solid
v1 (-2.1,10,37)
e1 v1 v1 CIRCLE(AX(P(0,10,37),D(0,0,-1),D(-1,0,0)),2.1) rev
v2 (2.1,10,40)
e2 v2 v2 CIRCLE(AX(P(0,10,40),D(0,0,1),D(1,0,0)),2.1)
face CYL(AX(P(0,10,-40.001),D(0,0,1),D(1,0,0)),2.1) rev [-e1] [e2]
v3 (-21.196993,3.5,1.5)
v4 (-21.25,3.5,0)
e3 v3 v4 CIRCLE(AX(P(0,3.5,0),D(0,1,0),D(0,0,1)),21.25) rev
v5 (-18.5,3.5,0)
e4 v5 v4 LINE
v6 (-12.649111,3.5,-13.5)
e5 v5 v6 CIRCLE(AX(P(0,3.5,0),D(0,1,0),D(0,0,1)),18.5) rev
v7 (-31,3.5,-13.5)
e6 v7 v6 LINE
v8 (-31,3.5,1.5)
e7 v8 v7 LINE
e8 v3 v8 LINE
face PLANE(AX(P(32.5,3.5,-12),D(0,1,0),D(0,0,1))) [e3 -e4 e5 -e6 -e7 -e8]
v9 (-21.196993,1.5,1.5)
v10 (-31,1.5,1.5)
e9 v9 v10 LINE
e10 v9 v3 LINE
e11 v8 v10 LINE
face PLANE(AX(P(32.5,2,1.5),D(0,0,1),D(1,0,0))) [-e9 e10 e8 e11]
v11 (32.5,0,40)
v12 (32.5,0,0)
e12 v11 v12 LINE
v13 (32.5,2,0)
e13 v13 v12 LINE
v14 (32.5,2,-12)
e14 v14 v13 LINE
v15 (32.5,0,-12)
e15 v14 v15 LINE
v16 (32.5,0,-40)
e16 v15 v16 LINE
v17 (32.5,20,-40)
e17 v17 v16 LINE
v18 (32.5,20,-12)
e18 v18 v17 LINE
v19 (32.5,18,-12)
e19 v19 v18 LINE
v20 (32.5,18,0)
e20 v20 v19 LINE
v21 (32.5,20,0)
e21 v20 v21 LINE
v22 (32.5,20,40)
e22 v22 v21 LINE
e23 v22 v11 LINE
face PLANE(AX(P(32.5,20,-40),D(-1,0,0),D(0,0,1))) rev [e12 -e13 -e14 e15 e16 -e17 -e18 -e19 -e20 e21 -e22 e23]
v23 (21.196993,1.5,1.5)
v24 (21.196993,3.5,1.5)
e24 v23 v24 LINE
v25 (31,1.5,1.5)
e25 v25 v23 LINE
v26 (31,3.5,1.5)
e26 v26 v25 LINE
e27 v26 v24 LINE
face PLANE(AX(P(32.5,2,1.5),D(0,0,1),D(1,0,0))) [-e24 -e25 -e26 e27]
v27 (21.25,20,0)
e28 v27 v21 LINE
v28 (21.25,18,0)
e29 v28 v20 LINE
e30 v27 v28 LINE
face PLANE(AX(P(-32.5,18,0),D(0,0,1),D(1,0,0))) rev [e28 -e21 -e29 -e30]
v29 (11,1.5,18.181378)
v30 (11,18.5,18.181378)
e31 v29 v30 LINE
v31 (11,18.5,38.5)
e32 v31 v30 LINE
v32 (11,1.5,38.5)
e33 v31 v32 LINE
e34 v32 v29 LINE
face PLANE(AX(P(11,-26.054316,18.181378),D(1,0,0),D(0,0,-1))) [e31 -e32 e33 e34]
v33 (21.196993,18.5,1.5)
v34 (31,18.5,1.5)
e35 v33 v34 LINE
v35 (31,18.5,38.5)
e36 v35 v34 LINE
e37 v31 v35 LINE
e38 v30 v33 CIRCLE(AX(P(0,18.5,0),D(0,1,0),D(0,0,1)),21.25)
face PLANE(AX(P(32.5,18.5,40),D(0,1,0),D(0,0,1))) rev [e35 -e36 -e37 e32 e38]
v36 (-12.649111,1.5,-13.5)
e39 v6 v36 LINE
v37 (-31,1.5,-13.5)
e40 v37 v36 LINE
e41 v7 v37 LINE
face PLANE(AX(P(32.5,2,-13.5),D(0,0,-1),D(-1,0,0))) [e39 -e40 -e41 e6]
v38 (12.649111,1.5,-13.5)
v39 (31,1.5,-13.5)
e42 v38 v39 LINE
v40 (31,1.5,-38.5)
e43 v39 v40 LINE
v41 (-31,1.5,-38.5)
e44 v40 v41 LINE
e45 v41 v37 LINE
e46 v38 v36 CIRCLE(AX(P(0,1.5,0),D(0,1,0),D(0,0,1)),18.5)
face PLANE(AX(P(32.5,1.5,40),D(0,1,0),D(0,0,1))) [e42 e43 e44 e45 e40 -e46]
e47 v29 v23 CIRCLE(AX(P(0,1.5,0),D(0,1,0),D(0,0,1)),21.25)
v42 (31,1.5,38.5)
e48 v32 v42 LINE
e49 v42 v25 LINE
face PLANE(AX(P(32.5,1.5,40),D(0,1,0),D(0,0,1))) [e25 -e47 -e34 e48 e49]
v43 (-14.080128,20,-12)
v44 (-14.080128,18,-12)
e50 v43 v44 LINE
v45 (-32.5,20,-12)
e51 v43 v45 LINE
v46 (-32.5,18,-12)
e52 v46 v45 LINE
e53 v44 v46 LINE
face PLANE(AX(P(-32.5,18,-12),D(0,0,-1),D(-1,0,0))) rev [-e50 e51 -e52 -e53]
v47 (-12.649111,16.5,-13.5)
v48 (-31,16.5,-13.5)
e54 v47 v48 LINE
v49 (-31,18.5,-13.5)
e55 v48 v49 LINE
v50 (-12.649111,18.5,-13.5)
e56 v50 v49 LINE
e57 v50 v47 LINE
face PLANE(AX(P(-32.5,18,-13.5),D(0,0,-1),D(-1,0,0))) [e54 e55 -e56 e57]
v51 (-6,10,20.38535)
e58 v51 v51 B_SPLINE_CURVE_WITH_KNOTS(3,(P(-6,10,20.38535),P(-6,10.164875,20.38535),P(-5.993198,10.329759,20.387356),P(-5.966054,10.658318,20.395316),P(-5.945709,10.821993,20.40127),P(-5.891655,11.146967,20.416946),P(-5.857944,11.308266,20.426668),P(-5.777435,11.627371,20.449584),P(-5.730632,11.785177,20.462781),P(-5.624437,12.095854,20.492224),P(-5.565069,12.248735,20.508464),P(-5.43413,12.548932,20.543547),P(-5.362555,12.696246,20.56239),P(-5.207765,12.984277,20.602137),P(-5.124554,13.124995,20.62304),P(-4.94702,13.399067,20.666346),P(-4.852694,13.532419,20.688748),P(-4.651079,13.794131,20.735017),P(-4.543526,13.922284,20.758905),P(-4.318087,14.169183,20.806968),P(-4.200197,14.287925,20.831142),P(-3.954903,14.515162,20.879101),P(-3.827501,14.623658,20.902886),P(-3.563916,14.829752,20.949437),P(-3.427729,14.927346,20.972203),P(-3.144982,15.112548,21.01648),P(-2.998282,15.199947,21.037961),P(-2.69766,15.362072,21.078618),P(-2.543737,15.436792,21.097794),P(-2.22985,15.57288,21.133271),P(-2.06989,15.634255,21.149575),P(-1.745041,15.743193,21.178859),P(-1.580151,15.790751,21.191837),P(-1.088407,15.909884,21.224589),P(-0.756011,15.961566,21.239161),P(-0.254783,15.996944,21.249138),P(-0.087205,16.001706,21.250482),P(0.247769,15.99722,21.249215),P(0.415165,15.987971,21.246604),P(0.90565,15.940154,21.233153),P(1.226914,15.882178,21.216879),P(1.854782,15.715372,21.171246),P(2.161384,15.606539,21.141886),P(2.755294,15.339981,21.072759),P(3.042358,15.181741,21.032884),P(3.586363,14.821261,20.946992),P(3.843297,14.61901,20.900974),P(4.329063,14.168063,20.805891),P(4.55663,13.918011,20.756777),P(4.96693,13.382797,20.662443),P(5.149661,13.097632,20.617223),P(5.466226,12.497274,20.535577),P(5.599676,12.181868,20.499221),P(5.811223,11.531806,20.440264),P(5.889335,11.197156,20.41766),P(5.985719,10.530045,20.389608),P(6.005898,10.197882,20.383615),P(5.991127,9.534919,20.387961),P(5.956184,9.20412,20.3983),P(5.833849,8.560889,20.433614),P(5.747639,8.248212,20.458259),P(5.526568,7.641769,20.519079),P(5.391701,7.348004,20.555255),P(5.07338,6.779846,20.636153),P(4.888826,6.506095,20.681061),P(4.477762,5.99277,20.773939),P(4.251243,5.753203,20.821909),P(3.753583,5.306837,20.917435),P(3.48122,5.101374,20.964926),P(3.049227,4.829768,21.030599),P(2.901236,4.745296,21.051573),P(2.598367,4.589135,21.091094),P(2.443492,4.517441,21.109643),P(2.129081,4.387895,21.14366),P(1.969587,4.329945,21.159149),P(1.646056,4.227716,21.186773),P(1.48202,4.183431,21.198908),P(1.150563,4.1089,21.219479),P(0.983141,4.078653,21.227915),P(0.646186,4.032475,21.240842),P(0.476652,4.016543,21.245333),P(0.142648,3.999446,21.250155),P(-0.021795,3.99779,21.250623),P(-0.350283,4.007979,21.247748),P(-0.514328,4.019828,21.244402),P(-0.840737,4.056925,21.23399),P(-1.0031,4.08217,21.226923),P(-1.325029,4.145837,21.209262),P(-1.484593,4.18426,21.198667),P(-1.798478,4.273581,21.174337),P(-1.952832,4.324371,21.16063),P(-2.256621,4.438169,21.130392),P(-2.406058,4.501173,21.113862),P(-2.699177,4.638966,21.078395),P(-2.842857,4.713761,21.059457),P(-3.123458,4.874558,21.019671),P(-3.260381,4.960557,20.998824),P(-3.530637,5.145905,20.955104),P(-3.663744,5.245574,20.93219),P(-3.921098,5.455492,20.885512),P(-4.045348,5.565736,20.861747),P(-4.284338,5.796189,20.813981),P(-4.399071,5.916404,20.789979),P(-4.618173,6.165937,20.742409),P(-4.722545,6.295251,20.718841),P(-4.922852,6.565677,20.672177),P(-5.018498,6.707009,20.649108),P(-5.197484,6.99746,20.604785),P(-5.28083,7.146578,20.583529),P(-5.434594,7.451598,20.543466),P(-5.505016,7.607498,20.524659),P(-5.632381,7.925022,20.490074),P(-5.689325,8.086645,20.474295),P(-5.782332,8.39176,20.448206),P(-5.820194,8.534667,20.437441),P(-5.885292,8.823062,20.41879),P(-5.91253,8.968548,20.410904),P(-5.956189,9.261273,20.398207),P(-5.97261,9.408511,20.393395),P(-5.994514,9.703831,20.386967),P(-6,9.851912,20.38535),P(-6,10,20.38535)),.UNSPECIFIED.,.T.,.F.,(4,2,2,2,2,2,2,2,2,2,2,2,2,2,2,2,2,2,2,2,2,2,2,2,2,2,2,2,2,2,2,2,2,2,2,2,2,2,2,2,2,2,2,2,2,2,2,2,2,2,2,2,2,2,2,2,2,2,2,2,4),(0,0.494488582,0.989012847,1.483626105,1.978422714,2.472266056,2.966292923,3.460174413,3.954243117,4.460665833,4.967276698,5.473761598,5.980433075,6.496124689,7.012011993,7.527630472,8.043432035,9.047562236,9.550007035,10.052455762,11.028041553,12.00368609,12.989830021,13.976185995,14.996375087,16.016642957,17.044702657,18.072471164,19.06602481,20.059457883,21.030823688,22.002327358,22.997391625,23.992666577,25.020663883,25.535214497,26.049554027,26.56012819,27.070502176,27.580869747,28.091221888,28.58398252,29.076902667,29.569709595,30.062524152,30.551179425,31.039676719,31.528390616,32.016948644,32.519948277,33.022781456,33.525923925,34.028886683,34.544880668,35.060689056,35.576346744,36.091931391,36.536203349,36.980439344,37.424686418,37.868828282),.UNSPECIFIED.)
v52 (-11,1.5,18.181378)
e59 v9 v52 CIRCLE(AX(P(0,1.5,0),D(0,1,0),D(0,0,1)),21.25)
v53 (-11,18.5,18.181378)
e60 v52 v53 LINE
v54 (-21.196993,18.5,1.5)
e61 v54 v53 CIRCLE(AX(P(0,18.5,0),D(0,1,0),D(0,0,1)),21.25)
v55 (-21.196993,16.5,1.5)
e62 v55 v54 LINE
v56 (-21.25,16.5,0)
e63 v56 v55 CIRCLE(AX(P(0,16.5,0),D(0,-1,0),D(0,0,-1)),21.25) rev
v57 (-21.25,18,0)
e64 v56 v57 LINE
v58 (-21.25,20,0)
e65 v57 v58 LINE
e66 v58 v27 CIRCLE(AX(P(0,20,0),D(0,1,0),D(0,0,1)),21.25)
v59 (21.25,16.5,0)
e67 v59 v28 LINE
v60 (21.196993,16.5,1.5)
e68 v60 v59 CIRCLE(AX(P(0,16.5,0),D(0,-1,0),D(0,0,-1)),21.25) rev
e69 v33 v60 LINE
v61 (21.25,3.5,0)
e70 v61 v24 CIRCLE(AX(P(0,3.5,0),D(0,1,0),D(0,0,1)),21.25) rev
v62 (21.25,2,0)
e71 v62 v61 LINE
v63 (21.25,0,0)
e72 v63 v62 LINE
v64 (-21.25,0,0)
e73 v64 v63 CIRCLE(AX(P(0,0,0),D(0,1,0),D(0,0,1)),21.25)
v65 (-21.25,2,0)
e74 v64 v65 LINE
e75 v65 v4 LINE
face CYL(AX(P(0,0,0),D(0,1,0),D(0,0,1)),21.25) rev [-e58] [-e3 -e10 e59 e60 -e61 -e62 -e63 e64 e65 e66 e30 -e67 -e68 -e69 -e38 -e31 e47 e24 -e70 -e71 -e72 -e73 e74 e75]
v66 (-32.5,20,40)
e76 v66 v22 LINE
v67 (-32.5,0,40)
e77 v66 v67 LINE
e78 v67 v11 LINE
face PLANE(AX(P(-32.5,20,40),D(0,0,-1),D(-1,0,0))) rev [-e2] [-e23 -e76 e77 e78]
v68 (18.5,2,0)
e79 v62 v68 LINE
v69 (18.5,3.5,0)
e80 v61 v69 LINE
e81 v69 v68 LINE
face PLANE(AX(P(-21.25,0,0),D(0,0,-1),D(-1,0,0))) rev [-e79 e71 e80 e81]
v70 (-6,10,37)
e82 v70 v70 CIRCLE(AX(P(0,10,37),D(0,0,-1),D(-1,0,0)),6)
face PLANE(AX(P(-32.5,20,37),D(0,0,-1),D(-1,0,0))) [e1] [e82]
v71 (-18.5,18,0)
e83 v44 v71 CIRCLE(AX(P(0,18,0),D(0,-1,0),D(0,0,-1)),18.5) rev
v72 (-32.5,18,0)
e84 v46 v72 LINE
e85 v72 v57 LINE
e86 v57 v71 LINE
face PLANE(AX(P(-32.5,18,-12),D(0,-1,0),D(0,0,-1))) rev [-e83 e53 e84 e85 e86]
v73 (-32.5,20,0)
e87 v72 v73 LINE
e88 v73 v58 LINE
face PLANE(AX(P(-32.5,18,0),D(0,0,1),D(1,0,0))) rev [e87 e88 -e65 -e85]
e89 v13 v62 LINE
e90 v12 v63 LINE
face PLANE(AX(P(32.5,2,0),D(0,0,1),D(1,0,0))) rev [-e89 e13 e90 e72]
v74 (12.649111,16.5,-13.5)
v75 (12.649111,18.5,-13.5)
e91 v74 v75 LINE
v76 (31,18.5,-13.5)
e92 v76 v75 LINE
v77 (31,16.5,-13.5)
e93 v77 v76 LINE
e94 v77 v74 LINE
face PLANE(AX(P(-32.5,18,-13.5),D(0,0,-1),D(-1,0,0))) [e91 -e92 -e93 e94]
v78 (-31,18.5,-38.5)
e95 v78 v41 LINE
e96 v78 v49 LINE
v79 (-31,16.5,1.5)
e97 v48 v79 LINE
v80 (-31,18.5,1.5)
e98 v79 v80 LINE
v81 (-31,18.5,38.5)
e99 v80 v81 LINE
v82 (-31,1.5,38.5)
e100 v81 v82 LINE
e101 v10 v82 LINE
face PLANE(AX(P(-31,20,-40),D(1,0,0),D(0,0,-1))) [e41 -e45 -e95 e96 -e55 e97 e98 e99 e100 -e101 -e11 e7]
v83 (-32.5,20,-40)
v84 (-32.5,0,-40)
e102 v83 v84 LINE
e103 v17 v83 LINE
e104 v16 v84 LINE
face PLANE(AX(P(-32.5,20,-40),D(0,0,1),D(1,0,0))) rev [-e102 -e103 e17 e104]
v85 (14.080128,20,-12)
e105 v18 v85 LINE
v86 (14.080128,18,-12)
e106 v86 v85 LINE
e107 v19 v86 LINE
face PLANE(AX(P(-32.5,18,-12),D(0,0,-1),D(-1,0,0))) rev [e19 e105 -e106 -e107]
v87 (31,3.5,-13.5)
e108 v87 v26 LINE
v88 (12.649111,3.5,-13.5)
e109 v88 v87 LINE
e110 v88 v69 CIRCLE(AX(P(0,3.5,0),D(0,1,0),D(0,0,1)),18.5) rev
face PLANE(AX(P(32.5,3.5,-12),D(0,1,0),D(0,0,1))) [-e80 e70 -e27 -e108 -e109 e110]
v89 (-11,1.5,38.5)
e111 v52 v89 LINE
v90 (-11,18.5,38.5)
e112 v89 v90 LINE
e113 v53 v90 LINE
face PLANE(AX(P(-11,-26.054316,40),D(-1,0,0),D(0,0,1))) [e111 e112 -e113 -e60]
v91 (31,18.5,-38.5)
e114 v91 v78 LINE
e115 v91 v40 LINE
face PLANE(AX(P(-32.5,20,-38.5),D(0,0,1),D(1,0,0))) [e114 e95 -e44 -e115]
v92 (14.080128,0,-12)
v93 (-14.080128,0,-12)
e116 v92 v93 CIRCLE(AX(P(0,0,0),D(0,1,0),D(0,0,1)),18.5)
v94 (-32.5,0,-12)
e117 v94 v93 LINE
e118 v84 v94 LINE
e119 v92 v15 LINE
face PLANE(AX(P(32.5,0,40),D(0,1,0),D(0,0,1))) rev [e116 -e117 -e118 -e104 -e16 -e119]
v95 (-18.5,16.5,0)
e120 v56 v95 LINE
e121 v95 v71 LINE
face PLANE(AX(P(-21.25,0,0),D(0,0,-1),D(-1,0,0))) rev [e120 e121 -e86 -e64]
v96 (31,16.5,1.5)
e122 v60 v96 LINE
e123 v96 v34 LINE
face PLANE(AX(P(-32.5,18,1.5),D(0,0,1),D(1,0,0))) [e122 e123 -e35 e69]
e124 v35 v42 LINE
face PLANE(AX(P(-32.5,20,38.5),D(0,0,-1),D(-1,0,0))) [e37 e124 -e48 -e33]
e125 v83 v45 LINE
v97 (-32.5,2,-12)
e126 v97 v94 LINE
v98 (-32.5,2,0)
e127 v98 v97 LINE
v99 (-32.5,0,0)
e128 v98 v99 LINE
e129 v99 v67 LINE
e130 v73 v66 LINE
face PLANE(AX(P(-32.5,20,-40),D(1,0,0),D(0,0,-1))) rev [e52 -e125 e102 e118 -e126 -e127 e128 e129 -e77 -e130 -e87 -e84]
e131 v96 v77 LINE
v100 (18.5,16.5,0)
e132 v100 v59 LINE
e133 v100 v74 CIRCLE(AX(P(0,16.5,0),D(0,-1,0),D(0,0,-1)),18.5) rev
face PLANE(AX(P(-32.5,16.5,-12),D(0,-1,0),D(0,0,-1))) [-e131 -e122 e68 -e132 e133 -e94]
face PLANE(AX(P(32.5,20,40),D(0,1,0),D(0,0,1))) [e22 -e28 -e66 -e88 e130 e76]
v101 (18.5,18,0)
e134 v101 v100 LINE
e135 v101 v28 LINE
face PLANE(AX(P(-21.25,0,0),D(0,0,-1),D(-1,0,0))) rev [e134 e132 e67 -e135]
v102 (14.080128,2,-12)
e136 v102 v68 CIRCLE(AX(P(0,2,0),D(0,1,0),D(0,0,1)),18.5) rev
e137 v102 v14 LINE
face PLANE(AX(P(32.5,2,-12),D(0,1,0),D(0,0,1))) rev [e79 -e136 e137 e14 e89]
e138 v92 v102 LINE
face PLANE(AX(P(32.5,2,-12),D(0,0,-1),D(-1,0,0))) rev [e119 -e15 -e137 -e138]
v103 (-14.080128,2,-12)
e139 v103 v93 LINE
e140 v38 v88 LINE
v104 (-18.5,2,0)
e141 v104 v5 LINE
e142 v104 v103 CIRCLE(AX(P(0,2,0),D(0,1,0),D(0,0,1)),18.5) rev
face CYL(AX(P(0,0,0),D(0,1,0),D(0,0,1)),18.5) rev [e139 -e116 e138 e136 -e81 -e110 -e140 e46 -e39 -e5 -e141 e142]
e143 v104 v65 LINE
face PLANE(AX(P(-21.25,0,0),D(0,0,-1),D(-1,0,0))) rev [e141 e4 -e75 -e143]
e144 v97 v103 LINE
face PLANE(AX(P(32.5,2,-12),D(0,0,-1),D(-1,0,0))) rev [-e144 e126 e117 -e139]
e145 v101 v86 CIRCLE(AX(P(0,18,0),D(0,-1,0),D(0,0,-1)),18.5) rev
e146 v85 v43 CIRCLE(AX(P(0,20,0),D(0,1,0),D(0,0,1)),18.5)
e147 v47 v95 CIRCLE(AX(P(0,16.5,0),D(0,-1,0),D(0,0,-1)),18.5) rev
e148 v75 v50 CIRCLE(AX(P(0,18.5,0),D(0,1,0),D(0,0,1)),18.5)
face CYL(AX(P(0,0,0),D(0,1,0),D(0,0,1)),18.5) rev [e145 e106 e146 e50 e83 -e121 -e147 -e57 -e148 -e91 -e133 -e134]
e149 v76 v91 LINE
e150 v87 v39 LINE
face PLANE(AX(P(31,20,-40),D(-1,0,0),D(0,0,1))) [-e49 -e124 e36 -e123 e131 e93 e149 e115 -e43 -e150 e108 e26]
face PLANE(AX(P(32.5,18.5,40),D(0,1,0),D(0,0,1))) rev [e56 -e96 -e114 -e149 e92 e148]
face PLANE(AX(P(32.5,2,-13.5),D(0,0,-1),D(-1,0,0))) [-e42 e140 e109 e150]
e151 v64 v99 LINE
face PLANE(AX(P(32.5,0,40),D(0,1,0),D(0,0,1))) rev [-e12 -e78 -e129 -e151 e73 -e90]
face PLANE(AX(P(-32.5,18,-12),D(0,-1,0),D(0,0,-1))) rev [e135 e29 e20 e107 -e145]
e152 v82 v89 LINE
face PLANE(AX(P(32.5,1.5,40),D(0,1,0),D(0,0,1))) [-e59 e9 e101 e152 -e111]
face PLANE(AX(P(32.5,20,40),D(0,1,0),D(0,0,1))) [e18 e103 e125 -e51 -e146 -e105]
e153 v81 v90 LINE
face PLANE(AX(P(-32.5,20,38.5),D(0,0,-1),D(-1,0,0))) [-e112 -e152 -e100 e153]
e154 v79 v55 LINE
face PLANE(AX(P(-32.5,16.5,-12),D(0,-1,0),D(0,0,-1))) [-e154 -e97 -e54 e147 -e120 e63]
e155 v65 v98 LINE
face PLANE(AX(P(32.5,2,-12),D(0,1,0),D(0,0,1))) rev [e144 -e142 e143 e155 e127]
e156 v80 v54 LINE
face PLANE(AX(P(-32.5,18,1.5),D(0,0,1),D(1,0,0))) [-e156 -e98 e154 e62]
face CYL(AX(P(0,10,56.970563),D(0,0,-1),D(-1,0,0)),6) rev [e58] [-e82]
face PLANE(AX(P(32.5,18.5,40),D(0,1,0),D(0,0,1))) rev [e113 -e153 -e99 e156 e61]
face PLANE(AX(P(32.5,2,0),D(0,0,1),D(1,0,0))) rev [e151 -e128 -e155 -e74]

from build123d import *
from build123d.topology import SkipClean

# Parameters (mm, degrees)
SKETCH_1_W              = 65
SKETCH_1_H              = 80
EXTRUDE_1_DEPTH         = 20
CUT_EXTRUDE_1_DEPTH     = 56.283360969
SKETCH_3_R              = 18.5
CUT_EXTRUDE_2_DEPTH     = 56.283360969
SKETCH_4_R              = 6
CUT_EXTRUDE_3_DEPTH     = 37
CUT_EXTRUDE_4_REACH     = 90.635
SKETCH_5_R              = 2.1
SKETCH_6_W              = 65
SKETCH_6_H              = 12
CUT_EXTRUDE_5_DEPTH     = 2
SKETCH_7_W              = 65
SKETCH_7_H              = 12
CUT_EXTRUDE_6_DEPTH     = 2
SHELL_START             = -38.5
SHELL_1_DEPTH           = 77
SHELL_1_2_DEPTH         = 25
SHELL_START_2           = 1.5
SHELL_1_3_DEPTH         = 37
EXTRUDE_START           = 21.249883538
EXTRUDE_2_OUTLINE_W     = 22
EXTRUDE_2_OUTLINE_H     = 17
EXTRUDE_2_OUTLINE_R     = 7.5
EXTRUDE_2_OUTLINE_H_2   = 26.054315759
EXTRUDE_2_DEPTH         = 18.750116462
EXTRUDE_START_2         = 18.181377836
EXTRUDE_2_2_OUTLINE_W   = 22
EXTRUDE_2_2_OUTLINE_H   = 17
EXTRUDE_2_2_OUTLINE_H_2 = 26.054315759
EXTRUDE_2_2_DEPTH       = 3.068505702
EXTRUDE_START_3         = -26.054315759
EXTRUDE_2_3_DEPTH       = 44.554315759
SKETCH_9_W              = 21.818622164
SKETCH_9_H              = 26.054315759
CUT_EXTRUDE_7_DEPTH     = 65.583878559


with BuildPart() as part:
    # 草图1 → 凸台-拉伸1 (new body)
    with BuildSketch(Plane(origin=(0, 0, 0), x_dir=(1, 0, 0), z_dir=(0, 1, 0))):
        Rectangle(SKETCH_1_W, SKETCH_1_H)
    extrude(amount=EXTRUDE_1_DEPTH)

    # 草图2 → 切除-拉伸1 (cut, through all)
    with BuildSketch(Plane(origin=(0, 20, 0), x_dir=(1, 0, 0), z_dir=(0, 1, 0))):
        with BuildLine():
            Line((-21.25, 0), (21.25, 0))
            ThreePointArc((21.25, 0), (0, -21.25), (-21.25, 0))
        make_face()
    extrude(amount=-CUT_EXTRUDE_1_DEPTH, mode=Mode.SUBTRACT)

    # 草图3 → 切除-拉伸2 (cut, through all)
    with BuildSketch(Plane(origin=(0, 20, 0), x_dir=(-1, 0, 0), z_dir=(0, 1, 0))):
        Circle(SKETCH_3_R)
    extrude(amount=-CUT_EXTRUDE_2_DEPTH, mode=Mode.SUBTRACT)

    # 草图4 → 切除-拉伸3 (cut)
    with BuildSketch(Plane.XY):
        with Locations(Location((0, 10, 0), (0, 0, 180))):
            Circle(SKETCH_4_R)
    extrude(amount=CUT_EXTRUDE_3_DEPTH, mode=Mode.SUBTRACT)

    # 草图5 → 切除-拉伸4 (cut, up to next)
    with BuildSketch(Plane.XY.offset(40), mode=Mode.PRIVATE) as cut_extrude_4_sk1:
        with Locations((0, 10)):
            Circle(SKETCH_5_R)
    cut_extrude_4_tool1 = extrude(cut_extrude_4_sk1.sketch, amount=-CUT_EXTRUDE_4_REACH, mode=Mode.PRIVATE) & part.part
    add(cut_extrude_4_tool1.solids().sort_by_distance((0, 10, 40))[0], mode=Mode.SUBTRACT)

    # 草图6 → 切除-拉伸5 (cut)
    with BuildSketch(Plane(origin=(0, 20, 0), x_dir=(1, 0, 0), z_dir=(0, 1, 0))):
        with Locations((0, 6)):
            Rectangle(SKETCH_6_W, SKETCH_6_H)
    extrude(amount=-CUT_EXTRUDE_5_DEPTH, mode=Mode.SUBTRACT)

    # 草图7 → 切除-拉伸6 (cut)
    with BuildSketch(Plane.XZ):
        with Locations((0, -6)):
            Rectangle(SKETCH_7_W, SKETCH_7_H)
    extrude(amount=-CUT_EXTRUDE_6_DEPTH, mode=Mode.SUBTRACT)

    # 抽壳1: read off the stored shape, not the designer's step
    # 抽壳1 outline → 抽壳1 (cut)
    with BuildSketch(Plane.XY.offset(SHELL_START)):
        with BuildLine():
            Line((3.741657387, 3.5), (31, 3.5))
            Line((31, 3.5), (31, 16.5))
            Line((31, 16.5), (3.741657387, 16.5))
            ThreePointArc((3.741657387, 16.5), (7.5, 10), (3.741657387, 3.5))
        make_face()
        with BuildLine():
            Line((-31, 16.5), (-31, 3.5))
            Line((-31, 3.5), (-3.741657387, 3.5))
            ThreePointArc((-3.741657387, 3.5), (-7.5, 10), (-3.741657387, 16.5))
            Line((-3.741657387, 16.5), (-31, 16.5))
        make_face()
    extrude(amount=SHELL_1_DEPTH, mode=Mode.SUBTRACT)

    # Shell 1 2 outline → Shell 1 2 (cut)
    with BuildSketch(Plane.XY.offset(SHELL_START)):
        with BuildLine():
            Line((-31, 1.5), (31, 1.5))
            Line((31, 1.5), (31, 3.5))
            Line((31, 3.5), (3.741657387, 3.5))
            ThreePointArc((3.741657387, 3.5), (7.5, 10), (3.741657387, 16.5))
            Line((3.741657387, 16.5), (31, 16.5))
            Line((31, 16.5), (31, 18.5))
            Line((31, 18.5), (-31, 18.5))
            Line((-31, 18.5), (-31, 16.5))
            Line((-31, 16.5), (-3.741657387, 16.5))
            ThreePointArc((-3.741657387, 16.5), (-7.5, 10), (-3.741657387, 3.5))
            Line((-3.741657387, 3.5), (-31, 3.5))
            Line((-31, 3.5), (-31, 1.5))
        make_face()
    extrude(amount=SHELL_1_2_DEPTH, mode=Mode.SUBTRACT)

    # Shell 1 3 outline → Shell 1 3 (cut)
    with BuildSketch(Plane.XY.offset(SHELL_START_2)):
        with BuildLine():
            Line((-31, 1.5), (31, 1.5))
            Line((31, 1.5), (31, 3.5))
            Line((31, 3.5), (3.741657387, 3.5))
            ThreePointArc((3.741657387, 3.5), (0, 2.5), (-3.741657387, 3.5))
            Line((-3.741657387, 3.5), (-31, 3.5))
            Line((-31, 3.5), (-31, 1.5))
        make_face()
        with BuildLine():
            Line((3.741657387, 16.5), (31, 16.5))
            Line((31, 16.5), (31, 18.5))
            Line((31, 18.5), (-31, 18.5))
            Line((-31, 18.5), (-31, 16.5))
            Line((-31, 16.5), (-3.741657387, 16.5))
            ThreePointArc((-3.741657387, 16.5), (0, 17.5), (3.741657387, 16.5))
        make_face()
    extrude(amount=SHELL_1_3_DEPTH, mode=Mode.SUBTRACT)

    # 凸台-拉伸2: read off the stored shape, not the designer's step
    # 凸台-拉伸2 outline → 凸台-拉伸2 (add)
    # profile 1 of 2: a face of its own
    with BuildSketch(Plane.XY.offset(EXTRUDE_START)):
        with Locations((0, 10)):
            Rectangle(EXTRUDE_2_OUTLINE_W, EXTRUDE_2_OUTLINE_H)
        with Locations((0, 10)):
            Circle(EXTRUDE_2_OUTLINE_R, mode=Mode.SUBTRACT)
    # profile 2 of 2: a face of its own
    with BuildSketch(Plane.XY.offset(EXTRUDE_START)):
        with Locations((0, -13.02715788)):
            Rectangle(EXTRUDE_2_OUTLINE_W, EXTRUDE_2_OUTLINE_H_2)
    extrude(amount=EXTRUDE_2_DEPTH)

    # Extrude 2 2 outline → Extrude 2 2 (add)
    # profile 1 of 2: a face of its own
    with BuildSketch(Plane.XY.offset(EXTRUDE_START_2)):
        with Locations((0, 10)):
            Rectangle(EXTRUDE_2_2_OUTLINE_W, EXTRUDE_2_2_OUTLINE_H)
        with BuildLine():
            ThreePointArc((0.070228488, 2.50032881), (-5.676e-05, 2.5), (-0.070342004, 2.500329874))
            ThreePointArc((-0.070342004, 2.500329874), (-7.5, 10.000015586), (-0.070310835, 17.499670419))
            ThreePointArc((-0.070310835, 17.499670419), (-2.7611e-05, 17.5), (0.070255616, 17.499670936))
            ThreePointArc((0.070255616, 17.499670936), (7.5, 9.999986435), (0.070228488, 2.50032881))
        make_face(mode=Mode.SUBTRACT)
    # profile 2 of 2: a face of its own
    with BuildSketch(Plane.XY.offset(EXTRUDE_START_2)):
        with Locations((0, -13.02715788)):
            Rectangle(EXTRUDE_2_2_OUTLINE_W, EXTRUDE_2_2_OUTLINE_H_2)
    extrude(amount=EXTRUDE_2_2_DEPTH)

    # Extrude 2 3 outline → Extrude 2 3 (cut)
    with SkipClean():  # the faces are left unmerged after this step: merging them gives an invalid solid
        with BuildSketch(Plane(origin=(0, 0, 0), x_dir=(1, 0, 0), z_dir=(0, 1, 0)).offset(EXTRUDE_START_3)):
            with BuildLine():
                Line((11, -18.181377836), (-11, -18.181377836))
                ThreePointArc((-11, -18.181377836), (0, -21.25), (11, -18.181377836))
            make_face()
        extrude(amount=EXTRUDE_2_3_DEPTH, mode=Mode.SUBTRACT)

    # 草图9 → 切除-拉伸7 (cut, through all)
    with SkipClean():  # the faces are left unmerged after this step: merging them gives an invalid solid
        with BuildSketch(Plane(origin=(11, 0, 0), x_dir=(0, 0, -1), z_dir=(1, 0, 0))):
            with Locations((-29.090688918, -13.02715788)):
                Rectangle(SKETCH_9_W, SKETCH_9_H)
        extrude(amount=-CUT_EXTRUDE_7_DEPTH, mode=Mode.SUBTRACT)


solid = part.part
